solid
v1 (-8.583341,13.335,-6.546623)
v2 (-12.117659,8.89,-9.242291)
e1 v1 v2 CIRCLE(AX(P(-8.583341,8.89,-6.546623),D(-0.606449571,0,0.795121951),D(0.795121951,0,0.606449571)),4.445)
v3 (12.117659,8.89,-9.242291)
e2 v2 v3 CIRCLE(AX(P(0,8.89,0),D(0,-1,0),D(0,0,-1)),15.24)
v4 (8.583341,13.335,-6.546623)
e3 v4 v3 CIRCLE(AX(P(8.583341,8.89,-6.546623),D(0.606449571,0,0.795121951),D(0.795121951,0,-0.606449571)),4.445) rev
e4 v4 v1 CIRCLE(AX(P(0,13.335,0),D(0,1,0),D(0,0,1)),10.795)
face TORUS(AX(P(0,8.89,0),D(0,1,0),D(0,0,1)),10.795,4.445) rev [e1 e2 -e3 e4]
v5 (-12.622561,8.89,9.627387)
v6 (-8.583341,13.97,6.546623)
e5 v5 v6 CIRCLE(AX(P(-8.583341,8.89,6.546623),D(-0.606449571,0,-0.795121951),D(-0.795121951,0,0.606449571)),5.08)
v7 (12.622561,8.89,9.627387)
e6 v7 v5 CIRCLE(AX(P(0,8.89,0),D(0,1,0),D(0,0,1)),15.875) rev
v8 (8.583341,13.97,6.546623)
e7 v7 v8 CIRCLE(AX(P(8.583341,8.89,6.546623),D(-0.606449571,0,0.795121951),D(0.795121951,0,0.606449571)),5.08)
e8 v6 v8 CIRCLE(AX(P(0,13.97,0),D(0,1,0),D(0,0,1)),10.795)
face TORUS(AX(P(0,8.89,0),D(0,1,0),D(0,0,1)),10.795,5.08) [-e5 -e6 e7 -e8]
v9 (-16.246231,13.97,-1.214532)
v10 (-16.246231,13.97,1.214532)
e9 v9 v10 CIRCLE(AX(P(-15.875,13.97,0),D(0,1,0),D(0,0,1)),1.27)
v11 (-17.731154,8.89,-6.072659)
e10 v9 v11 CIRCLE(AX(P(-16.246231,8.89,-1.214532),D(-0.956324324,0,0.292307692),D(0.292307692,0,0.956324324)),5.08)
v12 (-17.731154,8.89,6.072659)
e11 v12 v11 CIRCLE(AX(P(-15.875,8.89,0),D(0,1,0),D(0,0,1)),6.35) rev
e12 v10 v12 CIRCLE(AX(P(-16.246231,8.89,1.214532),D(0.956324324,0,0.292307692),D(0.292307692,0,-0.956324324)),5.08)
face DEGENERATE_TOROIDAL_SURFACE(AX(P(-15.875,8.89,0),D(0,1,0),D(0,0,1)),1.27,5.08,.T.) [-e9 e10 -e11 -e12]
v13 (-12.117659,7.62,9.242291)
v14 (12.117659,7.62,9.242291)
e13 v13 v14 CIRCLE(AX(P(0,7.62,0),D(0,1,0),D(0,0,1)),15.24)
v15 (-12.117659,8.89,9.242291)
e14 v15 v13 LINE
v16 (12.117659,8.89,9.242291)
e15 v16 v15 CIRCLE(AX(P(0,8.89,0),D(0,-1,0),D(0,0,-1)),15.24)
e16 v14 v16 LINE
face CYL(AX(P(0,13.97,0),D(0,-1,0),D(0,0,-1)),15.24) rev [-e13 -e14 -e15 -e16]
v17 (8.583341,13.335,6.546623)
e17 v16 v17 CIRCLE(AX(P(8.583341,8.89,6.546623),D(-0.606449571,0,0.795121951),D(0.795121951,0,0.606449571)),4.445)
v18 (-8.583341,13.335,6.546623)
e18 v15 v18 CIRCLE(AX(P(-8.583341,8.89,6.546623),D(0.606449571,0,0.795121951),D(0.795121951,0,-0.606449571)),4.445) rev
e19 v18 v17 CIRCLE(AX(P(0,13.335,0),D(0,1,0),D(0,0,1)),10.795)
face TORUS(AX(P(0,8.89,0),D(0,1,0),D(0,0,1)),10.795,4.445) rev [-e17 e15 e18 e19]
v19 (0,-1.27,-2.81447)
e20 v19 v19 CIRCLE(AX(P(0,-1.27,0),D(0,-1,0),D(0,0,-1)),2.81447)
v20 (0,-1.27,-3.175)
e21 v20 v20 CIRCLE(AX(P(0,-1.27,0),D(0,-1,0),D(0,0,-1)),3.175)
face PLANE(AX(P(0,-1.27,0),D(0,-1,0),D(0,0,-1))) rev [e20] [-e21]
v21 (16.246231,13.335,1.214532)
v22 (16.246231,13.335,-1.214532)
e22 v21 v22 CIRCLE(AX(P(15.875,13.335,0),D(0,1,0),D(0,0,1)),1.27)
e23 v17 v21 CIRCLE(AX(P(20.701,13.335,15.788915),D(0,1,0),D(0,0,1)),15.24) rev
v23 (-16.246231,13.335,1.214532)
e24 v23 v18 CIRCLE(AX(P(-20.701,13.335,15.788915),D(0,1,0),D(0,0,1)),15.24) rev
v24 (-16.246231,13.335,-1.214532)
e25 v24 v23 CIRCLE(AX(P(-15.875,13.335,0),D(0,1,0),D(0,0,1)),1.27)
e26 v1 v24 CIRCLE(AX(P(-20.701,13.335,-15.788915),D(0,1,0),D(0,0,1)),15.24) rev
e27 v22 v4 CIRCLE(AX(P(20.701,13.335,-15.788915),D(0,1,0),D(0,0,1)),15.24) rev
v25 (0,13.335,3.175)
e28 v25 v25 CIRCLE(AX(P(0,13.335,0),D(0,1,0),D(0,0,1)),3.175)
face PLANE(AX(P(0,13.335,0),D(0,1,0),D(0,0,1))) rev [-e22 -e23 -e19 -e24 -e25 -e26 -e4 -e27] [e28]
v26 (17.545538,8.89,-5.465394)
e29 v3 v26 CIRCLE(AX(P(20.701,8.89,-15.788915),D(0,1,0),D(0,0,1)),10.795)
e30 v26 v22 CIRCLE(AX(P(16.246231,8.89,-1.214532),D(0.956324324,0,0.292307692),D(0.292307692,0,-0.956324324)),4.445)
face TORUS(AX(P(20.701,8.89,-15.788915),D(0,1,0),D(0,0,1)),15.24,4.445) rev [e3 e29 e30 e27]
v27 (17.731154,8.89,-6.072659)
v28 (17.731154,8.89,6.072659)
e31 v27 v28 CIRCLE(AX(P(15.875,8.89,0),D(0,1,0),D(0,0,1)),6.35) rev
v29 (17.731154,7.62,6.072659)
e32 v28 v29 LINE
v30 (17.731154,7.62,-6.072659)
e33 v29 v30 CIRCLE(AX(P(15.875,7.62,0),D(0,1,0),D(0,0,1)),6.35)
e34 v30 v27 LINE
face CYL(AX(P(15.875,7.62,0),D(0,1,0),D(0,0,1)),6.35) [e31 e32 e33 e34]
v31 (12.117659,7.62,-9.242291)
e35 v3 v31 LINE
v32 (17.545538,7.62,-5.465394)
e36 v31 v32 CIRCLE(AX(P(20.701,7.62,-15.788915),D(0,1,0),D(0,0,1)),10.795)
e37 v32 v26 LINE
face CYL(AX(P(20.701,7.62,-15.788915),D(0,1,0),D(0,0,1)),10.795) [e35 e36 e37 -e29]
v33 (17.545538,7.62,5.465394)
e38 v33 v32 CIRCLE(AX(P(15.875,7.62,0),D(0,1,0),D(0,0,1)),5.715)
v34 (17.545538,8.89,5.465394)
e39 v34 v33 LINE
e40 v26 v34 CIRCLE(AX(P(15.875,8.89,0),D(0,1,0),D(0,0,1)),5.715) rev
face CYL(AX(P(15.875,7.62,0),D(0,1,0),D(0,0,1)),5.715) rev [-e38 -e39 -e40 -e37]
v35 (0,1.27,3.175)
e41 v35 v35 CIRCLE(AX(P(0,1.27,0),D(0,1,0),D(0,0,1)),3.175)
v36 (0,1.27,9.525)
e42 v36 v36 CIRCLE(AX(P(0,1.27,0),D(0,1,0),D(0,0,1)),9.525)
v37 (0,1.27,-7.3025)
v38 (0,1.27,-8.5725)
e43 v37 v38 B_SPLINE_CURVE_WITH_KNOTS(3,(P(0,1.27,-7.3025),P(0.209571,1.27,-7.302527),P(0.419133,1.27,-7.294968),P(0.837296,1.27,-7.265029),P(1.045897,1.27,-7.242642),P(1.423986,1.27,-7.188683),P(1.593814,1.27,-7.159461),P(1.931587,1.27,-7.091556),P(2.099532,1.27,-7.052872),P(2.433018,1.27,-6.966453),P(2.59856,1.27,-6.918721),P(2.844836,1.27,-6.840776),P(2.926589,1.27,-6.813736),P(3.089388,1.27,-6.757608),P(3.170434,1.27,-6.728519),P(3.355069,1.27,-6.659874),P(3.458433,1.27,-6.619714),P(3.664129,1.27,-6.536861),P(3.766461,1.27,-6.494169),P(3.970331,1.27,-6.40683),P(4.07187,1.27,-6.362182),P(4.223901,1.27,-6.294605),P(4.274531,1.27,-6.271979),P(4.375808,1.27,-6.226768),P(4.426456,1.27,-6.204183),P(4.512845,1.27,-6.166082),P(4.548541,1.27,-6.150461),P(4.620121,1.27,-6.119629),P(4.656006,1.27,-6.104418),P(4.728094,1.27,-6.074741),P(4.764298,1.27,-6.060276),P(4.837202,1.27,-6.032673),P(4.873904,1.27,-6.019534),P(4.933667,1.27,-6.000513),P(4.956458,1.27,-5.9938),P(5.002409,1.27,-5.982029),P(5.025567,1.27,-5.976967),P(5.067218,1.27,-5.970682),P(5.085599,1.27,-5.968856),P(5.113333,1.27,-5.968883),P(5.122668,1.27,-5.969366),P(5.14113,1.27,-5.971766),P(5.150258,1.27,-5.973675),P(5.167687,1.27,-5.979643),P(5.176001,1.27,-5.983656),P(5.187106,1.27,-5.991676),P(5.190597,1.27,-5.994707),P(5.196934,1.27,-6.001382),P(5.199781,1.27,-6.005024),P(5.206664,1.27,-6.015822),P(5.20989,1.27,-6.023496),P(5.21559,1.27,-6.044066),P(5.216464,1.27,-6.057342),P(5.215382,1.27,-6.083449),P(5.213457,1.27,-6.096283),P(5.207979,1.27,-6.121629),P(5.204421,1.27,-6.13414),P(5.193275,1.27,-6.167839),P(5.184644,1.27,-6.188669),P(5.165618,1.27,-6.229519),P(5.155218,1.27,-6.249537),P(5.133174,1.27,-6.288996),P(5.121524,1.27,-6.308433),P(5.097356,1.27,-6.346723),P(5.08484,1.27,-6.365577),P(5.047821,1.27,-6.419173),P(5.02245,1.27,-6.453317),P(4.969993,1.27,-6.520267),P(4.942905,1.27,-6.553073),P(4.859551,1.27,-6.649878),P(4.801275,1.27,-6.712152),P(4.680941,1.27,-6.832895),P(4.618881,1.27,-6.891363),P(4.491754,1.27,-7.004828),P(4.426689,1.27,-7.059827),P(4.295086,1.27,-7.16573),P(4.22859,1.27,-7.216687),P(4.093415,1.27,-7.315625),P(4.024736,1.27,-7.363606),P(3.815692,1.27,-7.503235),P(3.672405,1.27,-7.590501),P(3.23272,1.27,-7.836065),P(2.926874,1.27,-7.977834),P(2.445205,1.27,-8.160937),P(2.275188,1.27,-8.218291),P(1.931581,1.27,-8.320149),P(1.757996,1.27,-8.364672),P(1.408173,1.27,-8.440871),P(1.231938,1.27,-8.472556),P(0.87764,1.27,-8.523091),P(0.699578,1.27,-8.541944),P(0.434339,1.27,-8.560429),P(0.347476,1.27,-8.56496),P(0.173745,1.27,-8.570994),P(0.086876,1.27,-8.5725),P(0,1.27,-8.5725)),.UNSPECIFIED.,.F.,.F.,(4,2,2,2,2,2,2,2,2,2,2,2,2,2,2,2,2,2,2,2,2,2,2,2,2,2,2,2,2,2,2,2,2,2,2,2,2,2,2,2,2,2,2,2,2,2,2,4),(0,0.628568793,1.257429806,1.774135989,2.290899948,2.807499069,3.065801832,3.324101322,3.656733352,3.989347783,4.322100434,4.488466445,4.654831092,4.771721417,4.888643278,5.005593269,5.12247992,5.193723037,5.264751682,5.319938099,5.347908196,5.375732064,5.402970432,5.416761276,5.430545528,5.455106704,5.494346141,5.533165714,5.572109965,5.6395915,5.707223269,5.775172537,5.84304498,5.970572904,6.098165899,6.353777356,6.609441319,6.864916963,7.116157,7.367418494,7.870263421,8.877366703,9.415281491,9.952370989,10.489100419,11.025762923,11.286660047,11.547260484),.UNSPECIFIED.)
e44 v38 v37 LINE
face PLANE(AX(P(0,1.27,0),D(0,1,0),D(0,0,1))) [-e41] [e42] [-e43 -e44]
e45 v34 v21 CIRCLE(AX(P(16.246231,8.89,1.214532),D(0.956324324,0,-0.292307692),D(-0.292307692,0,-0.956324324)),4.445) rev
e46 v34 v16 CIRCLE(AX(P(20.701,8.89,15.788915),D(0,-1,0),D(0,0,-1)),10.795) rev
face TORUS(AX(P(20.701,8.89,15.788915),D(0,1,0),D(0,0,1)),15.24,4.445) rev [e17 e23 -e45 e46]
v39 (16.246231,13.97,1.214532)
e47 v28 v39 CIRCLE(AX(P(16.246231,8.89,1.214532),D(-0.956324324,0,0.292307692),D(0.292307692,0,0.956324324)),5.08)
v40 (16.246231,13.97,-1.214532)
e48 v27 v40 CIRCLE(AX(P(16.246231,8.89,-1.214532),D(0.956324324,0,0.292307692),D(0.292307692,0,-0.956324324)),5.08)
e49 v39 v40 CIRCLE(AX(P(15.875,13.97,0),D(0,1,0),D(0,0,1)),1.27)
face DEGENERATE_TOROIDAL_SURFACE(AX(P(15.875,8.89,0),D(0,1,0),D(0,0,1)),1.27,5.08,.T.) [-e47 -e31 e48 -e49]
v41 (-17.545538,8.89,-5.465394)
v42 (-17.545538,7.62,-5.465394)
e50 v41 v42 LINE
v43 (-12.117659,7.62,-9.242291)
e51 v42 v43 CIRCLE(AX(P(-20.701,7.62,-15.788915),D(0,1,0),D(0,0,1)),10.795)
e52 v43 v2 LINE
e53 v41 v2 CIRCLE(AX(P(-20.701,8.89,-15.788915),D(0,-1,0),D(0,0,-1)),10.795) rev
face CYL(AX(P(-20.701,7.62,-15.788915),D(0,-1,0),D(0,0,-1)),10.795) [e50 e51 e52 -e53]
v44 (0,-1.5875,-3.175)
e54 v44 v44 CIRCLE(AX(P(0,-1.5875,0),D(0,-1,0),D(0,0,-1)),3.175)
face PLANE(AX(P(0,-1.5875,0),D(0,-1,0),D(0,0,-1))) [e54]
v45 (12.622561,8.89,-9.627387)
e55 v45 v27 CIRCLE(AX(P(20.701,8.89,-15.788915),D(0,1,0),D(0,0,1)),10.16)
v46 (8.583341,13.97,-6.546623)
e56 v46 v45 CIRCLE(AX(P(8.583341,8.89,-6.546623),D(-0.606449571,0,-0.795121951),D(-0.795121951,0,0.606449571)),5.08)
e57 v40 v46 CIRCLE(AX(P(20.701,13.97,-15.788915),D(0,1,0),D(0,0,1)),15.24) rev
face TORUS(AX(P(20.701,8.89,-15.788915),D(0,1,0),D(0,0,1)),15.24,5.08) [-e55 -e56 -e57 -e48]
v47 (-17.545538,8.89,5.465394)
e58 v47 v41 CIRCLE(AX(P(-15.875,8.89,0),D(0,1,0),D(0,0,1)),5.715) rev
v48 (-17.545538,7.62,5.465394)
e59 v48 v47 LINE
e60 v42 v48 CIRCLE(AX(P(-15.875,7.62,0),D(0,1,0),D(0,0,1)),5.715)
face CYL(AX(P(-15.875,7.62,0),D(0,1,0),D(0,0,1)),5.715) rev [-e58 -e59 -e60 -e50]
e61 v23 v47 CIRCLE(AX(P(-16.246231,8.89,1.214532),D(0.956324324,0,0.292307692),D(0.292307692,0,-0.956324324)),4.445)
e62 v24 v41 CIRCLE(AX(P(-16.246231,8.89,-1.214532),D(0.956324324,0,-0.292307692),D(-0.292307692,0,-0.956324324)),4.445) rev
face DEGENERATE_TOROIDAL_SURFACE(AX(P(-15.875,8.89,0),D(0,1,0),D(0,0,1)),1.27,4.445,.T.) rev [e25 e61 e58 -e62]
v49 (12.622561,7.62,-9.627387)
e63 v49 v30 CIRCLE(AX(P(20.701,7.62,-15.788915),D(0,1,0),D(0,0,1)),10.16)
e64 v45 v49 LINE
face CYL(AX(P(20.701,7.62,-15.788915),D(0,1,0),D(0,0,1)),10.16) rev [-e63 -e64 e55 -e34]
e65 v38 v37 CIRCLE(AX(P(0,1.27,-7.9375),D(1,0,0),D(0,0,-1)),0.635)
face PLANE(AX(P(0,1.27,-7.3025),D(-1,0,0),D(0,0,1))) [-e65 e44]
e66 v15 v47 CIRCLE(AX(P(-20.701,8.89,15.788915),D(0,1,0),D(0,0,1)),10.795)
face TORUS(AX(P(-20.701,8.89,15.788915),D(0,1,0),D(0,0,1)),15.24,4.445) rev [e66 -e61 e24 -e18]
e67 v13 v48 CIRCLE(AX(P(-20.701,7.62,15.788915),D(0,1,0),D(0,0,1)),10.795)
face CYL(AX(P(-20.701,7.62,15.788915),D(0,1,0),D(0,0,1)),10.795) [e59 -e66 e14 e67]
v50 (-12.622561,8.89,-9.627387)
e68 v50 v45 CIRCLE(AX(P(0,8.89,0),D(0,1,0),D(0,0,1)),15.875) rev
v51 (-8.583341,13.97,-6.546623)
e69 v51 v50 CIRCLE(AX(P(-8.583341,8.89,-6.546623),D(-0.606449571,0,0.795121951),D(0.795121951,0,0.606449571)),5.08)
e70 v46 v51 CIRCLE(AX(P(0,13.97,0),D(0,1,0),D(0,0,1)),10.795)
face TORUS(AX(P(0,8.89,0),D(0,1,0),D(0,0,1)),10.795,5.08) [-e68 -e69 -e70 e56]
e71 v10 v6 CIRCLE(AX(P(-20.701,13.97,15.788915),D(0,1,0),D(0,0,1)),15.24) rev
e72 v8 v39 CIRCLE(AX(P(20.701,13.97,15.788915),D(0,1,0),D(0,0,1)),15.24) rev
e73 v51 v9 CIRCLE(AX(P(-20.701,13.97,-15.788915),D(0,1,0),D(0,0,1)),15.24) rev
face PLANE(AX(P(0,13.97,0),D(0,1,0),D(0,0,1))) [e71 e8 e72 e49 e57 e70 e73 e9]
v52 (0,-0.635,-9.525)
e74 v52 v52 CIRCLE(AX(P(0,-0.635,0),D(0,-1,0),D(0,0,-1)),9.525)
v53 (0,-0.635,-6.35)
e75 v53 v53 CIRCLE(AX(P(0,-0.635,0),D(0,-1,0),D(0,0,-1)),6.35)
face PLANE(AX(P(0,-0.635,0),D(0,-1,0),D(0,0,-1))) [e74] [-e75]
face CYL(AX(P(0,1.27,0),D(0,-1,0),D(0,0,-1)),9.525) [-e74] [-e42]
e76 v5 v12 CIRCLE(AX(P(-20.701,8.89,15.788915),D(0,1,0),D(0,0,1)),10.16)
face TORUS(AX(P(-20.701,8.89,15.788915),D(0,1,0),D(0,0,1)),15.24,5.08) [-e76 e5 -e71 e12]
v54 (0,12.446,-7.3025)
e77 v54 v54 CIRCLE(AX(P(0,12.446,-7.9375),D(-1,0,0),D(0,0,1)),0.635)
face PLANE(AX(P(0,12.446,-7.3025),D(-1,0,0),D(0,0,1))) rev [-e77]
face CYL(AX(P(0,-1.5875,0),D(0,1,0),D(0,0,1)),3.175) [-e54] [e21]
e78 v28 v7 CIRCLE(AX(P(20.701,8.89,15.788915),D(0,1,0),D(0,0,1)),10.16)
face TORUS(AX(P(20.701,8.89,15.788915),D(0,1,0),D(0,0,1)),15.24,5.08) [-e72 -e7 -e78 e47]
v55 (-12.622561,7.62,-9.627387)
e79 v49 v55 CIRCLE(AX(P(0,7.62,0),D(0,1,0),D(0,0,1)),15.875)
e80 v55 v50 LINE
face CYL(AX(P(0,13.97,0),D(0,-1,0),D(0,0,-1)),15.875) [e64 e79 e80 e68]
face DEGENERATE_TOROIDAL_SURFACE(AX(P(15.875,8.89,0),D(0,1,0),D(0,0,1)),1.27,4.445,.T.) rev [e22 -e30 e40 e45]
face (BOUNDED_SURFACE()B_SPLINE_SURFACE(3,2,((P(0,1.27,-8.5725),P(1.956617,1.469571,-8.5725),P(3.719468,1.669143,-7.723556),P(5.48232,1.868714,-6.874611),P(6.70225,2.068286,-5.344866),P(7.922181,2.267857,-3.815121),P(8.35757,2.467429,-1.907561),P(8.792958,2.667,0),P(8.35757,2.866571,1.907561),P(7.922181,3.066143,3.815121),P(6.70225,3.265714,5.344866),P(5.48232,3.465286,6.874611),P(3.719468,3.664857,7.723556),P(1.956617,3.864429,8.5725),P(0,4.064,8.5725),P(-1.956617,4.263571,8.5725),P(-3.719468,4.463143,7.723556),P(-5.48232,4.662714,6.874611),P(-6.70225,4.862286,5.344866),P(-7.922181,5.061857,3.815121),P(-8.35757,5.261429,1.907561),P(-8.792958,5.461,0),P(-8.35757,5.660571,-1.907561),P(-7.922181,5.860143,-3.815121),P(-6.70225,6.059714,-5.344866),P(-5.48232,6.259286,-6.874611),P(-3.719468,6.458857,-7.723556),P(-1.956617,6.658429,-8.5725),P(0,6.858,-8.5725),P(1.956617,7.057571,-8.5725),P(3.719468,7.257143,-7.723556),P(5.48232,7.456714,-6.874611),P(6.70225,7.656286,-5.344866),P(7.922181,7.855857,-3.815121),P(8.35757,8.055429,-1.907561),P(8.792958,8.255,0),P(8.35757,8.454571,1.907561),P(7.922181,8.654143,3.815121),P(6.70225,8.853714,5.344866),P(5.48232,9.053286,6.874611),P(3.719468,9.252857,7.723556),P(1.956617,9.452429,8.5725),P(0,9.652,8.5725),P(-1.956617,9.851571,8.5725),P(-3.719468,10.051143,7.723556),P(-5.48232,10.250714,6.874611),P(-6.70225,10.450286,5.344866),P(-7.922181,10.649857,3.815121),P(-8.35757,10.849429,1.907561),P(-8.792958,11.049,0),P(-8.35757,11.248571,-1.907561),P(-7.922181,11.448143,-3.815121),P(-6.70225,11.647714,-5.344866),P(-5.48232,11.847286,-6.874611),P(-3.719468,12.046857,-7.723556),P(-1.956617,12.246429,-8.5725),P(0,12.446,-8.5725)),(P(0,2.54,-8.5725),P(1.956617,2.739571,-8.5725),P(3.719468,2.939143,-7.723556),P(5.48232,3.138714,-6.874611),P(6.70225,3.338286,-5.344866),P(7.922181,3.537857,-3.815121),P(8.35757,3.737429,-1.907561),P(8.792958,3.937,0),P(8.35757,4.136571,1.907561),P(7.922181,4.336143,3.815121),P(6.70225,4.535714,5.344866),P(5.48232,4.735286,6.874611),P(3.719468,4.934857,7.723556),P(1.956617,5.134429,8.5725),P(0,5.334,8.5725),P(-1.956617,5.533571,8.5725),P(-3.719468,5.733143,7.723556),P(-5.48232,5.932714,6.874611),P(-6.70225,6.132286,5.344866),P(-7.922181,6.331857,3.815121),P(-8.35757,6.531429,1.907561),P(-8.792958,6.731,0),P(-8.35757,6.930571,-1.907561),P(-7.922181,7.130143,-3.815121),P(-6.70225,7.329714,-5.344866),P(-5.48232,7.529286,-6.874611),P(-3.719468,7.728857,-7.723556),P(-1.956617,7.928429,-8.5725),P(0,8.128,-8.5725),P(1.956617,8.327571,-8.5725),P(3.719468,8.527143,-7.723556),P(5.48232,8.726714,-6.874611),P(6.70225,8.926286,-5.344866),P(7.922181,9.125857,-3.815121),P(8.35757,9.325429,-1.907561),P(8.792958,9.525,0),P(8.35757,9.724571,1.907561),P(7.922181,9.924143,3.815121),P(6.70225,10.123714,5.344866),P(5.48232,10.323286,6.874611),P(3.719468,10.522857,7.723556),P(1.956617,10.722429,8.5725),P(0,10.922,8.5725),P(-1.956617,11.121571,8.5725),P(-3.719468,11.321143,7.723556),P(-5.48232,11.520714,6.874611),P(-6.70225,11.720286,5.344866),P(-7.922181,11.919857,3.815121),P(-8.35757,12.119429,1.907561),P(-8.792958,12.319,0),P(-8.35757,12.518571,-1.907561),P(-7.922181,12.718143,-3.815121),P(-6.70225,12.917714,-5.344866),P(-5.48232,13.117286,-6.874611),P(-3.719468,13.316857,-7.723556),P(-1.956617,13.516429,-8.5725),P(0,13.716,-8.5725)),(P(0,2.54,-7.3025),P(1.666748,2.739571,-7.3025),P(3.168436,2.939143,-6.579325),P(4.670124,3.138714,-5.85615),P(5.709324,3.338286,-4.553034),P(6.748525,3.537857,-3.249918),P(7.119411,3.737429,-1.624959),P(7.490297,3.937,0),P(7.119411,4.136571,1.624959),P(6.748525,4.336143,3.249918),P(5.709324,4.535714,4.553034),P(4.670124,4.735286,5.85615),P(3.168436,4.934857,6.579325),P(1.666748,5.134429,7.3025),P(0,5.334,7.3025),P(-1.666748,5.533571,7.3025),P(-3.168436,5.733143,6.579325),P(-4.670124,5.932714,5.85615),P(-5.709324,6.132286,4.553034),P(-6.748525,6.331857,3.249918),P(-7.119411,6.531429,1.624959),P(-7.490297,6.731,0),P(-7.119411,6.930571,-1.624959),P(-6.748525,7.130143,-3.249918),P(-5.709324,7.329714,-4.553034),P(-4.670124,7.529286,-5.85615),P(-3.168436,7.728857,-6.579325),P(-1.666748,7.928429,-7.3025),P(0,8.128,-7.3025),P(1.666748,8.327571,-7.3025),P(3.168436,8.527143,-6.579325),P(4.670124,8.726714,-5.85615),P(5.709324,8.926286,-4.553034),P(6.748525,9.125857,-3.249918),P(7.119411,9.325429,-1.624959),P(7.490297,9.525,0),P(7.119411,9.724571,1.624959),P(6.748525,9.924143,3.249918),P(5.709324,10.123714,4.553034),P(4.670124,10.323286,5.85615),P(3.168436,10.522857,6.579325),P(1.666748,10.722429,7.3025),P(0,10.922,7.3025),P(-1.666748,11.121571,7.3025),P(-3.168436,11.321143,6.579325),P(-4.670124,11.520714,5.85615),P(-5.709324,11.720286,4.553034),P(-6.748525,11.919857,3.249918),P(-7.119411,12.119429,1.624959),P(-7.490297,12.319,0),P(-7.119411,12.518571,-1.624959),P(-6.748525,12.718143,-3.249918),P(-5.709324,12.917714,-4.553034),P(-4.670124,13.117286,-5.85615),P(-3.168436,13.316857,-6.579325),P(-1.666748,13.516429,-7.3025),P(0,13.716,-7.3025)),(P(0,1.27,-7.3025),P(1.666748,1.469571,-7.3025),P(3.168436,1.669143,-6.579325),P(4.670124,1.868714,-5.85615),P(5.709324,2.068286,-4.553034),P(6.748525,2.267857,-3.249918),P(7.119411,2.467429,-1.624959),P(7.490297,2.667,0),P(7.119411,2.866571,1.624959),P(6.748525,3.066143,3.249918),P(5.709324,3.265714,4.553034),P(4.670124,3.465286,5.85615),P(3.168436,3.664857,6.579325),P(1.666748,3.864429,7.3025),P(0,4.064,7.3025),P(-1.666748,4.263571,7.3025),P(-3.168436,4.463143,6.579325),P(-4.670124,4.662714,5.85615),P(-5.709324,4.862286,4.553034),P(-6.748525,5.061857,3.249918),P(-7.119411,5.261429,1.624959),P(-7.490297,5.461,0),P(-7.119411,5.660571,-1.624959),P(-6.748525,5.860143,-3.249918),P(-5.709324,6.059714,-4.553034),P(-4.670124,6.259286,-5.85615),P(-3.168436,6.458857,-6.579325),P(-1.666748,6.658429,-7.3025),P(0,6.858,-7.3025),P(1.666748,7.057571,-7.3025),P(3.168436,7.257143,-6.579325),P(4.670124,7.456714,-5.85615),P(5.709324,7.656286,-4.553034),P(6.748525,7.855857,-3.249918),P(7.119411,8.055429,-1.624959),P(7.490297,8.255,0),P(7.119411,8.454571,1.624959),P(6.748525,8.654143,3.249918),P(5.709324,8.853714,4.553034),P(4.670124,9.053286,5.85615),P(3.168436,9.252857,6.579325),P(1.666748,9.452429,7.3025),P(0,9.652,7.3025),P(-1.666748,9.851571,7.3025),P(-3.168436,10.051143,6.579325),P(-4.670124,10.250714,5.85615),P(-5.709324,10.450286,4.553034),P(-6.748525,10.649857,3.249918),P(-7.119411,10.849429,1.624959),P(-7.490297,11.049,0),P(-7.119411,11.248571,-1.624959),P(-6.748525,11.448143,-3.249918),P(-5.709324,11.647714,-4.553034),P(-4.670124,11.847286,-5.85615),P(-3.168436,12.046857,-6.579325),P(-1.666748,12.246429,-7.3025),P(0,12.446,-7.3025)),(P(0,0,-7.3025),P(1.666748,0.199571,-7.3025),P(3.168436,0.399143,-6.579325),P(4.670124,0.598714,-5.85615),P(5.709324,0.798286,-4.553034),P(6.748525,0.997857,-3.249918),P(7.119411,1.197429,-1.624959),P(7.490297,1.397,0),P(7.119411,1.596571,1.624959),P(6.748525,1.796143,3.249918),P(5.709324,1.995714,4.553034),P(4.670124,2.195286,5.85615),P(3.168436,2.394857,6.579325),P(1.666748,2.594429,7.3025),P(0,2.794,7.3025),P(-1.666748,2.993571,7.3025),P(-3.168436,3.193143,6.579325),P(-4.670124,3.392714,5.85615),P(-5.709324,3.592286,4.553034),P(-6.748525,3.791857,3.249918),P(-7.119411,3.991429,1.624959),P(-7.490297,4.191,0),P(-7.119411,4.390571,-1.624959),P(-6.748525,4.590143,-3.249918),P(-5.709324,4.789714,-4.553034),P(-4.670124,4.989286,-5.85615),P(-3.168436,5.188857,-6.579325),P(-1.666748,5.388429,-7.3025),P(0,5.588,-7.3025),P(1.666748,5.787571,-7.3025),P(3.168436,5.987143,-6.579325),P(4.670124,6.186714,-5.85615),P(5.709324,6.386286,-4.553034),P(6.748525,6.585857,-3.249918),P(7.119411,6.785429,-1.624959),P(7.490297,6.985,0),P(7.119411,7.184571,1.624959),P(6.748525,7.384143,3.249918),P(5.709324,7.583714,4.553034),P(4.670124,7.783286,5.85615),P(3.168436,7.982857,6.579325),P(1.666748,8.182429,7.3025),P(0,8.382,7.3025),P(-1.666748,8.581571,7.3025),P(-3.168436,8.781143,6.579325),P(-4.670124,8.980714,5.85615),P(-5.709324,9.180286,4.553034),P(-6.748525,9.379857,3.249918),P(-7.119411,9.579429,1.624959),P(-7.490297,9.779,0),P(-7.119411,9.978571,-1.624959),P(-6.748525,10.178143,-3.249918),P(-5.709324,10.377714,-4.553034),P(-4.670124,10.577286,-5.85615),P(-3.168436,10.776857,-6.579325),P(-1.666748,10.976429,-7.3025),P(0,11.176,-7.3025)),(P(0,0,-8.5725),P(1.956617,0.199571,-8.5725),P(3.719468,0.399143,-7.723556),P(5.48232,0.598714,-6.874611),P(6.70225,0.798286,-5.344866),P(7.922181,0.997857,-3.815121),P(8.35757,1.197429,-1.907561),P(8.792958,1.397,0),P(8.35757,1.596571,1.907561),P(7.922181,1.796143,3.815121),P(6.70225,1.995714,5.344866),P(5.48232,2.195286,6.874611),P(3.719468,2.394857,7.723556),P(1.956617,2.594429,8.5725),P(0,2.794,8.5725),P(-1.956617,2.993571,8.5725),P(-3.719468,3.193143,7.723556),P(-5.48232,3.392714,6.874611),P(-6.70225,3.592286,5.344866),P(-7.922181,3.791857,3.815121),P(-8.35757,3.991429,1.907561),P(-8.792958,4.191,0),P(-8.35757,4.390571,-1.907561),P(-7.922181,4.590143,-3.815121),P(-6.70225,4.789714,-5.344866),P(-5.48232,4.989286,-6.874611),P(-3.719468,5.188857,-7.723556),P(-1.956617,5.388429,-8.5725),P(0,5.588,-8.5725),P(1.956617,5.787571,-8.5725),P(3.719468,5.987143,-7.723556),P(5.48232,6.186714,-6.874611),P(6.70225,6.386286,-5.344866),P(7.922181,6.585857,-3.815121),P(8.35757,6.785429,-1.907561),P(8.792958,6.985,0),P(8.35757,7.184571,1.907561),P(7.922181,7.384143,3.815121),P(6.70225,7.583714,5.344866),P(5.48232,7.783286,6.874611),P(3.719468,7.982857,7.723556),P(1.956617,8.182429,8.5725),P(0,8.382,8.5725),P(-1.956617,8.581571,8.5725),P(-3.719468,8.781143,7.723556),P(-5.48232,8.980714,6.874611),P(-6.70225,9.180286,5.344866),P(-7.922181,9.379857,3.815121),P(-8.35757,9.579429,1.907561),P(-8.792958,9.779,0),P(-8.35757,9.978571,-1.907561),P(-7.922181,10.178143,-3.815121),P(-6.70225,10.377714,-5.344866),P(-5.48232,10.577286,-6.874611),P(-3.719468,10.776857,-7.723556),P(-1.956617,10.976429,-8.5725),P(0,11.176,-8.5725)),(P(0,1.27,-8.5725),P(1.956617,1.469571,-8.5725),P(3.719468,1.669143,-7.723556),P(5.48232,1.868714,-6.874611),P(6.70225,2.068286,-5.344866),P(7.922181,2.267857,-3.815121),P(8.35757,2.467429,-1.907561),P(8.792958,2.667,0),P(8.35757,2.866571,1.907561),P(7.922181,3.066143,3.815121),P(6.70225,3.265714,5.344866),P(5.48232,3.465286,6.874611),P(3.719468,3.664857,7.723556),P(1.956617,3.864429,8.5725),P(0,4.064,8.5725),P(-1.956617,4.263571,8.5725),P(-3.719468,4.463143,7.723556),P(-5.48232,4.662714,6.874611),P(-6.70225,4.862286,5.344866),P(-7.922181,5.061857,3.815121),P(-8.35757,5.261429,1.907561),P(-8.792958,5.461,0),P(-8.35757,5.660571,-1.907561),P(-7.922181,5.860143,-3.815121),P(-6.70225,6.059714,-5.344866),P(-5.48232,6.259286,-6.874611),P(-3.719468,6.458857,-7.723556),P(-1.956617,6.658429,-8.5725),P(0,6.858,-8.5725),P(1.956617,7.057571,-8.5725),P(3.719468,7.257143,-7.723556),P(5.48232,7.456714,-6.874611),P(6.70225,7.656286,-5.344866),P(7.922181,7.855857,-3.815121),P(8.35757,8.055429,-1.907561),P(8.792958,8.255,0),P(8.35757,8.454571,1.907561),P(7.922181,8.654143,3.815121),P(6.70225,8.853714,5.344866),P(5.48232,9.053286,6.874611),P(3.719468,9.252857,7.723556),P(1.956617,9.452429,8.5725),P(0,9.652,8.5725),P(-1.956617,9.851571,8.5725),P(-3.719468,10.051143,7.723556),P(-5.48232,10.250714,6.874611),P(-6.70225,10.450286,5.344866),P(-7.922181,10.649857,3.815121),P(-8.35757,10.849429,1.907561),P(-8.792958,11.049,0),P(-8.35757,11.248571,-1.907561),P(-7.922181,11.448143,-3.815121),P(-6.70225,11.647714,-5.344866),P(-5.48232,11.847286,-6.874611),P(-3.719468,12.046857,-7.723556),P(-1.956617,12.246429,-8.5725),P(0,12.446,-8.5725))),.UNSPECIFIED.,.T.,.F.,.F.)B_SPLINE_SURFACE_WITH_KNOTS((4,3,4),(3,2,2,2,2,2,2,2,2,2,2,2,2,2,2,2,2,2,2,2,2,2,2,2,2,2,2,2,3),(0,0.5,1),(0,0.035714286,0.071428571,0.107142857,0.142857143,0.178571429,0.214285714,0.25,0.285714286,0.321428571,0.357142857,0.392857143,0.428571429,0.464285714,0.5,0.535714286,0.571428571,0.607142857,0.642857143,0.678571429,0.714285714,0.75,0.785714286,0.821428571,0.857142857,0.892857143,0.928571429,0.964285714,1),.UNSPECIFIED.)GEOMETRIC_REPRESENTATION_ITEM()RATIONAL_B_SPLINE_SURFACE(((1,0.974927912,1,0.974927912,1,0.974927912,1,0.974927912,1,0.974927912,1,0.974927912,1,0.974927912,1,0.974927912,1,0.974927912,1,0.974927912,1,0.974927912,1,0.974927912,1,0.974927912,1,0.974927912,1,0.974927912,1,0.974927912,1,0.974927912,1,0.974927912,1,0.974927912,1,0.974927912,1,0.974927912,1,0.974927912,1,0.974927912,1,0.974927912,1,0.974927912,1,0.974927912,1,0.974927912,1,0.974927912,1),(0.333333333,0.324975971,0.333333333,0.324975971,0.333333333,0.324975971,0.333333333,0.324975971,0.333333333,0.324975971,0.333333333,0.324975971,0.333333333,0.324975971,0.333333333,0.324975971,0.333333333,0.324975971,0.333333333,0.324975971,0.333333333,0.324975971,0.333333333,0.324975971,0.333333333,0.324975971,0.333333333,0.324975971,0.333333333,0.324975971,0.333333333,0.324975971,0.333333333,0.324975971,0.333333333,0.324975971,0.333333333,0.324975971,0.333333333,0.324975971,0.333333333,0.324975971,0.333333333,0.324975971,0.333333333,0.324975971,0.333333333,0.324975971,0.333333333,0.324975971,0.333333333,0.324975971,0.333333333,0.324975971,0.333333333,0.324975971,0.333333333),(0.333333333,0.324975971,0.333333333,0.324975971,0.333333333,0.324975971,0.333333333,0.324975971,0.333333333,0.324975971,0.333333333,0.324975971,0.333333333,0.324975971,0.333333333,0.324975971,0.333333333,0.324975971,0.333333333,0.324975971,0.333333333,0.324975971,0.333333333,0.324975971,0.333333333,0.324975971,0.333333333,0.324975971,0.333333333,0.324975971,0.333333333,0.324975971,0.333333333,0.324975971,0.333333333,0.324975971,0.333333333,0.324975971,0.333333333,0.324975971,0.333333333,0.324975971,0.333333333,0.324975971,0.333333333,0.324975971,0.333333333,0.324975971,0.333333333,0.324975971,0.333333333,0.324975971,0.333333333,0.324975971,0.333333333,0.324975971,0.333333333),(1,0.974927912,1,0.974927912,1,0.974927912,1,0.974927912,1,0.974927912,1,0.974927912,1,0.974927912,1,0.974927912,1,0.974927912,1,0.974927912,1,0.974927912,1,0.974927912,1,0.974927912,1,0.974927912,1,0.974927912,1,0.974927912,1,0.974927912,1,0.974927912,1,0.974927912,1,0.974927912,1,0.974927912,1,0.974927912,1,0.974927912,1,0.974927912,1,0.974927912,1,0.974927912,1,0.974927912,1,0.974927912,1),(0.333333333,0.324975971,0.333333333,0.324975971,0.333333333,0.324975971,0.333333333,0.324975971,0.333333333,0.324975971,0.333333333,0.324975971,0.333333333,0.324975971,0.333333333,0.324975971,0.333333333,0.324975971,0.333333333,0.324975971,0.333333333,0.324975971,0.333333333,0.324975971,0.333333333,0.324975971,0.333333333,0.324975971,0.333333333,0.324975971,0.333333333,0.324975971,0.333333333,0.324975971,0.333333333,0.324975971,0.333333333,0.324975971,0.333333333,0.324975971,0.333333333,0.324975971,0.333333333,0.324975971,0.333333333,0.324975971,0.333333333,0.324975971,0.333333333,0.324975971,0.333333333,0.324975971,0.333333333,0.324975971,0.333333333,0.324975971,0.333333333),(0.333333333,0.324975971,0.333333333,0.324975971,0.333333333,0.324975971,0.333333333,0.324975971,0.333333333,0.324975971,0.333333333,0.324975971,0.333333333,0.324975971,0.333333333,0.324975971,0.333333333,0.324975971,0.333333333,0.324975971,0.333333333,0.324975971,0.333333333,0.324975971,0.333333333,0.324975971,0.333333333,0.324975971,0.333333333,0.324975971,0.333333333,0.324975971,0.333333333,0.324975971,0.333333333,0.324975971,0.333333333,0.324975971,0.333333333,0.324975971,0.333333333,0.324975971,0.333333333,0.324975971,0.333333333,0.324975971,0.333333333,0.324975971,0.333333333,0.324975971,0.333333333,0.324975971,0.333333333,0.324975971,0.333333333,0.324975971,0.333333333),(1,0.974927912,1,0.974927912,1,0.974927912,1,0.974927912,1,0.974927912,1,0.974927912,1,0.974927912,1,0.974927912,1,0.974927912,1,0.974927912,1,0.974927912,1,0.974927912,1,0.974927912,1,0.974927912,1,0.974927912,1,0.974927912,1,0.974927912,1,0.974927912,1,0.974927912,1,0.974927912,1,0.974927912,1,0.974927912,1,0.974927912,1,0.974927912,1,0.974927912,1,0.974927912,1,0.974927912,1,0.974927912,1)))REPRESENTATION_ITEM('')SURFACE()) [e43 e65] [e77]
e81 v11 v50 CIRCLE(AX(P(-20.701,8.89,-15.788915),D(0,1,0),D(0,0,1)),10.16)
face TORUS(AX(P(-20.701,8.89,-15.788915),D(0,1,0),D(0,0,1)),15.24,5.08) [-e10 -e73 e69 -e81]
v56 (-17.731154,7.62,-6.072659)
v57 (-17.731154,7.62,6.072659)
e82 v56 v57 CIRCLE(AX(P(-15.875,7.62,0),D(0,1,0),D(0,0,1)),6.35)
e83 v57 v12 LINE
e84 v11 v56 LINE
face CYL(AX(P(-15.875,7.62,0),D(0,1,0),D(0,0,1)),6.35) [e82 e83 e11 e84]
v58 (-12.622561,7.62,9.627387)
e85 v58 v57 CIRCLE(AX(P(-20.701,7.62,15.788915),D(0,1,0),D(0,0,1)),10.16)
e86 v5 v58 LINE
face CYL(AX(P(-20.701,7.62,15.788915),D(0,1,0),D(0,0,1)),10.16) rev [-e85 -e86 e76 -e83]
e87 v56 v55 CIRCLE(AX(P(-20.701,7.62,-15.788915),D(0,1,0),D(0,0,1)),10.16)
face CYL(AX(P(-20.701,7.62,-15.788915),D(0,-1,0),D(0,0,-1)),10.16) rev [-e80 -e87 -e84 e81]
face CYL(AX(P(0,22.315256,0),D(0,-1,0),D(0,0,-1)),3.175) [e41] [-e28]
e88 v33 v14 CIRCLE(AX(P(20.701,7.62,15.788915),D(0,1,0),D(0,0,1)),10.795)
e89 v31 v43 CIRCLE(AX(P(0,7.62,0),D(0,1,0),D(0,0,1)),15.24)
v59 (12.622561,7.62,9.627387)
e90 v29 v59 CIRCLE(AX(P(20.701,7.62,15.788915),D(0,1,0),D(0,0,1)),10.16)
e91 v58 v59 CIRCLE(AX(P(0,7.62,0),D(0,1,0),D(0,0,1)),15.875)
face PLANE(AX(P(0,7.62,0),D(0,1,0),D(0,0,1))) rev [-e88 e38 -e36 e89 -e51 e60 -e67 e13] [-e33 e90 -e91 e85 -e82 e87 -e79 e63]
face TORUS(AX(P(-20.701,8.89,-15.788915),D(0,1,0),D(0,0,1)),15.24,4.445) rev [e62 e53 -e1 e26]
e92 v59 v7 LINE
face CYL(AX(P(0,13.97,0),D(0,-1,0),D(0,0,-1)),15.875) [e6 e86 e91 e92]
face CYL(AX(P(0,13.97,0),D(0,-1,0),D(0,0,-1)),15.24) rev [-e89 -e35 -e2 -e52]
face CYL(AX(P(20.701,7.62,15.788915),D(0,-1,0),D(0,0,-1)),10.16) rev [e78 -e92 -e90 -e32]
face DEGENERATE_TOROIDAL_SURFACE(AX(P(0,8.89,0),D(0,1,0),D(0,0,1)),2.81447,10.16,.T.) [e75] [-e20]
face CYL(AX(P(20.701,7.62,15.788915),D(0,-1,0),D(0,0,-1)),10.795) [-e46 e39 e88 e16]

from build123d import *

# Parameters (mm, degrees)
SKETCH1_R           = 9.525
BOSS_EXTRUDE1_DEPTH = 1.27
BOSS_EXTRUDE3_START = 0.635
SKETCH2_R           = 9.525
BOSS_EXTRUDE3_DEPTH = 0.635
SKETCH3_R           = 6.35
BOSS_EXTRUDE4_DEPTH = 0.635
FILLET1_R           = 10.16
SKETCH4_R           = 3.175
BOSS_EXTRUDE5_DEPTH = 0.3175
SKETCH6_R           = 15.875
BOSS_EXTRUDE7_DEPTH = 6.35
SKETCH7_R           = 6.35
BOSS_EXTRUDE8_DEPTH = 6.35
FILLET2_R           = 10.16
FILLET3_R           = 5.08
SHELL1_T            = -0.635
BOSS_EXTRUDE9_REACH = 32.121
SKETCH5_R           = 3.175
SWEEP1_PITCH        = 5.588
SWEEP1_HEIGHT       = 11.176
SWEEP1_RADIUS       = 7.9375
SWEEP1_START_ANGLE  = -180
SKETCH10_R          = 0.635


with BuildPart() as part:
    # Sketch1 → Boss-Extrude1 (new body)
    with BuildSketch(Plane(origin=(0, 0, 0), x_dir=(1, 0, 0), z_dir=(0, 1, 0))):
        with Locations(Location((0, 0, 0), (0, 0, 270))):
            Circle(SKETCH1_R)
    extrude(amount=BOSS_EXTRUDE1_DEPTH)

    # Sketch2 → Boss-Extrude3 (add)
    with BuildSketch(Plane.XZ.offset(BOSS_EXTRUDE3_START)):
        with Locations(Location((0, 0, 0), (0, 0, 270))):
            Circle(SKETCH2_R)
    extrude(amount=-BOSS_EXTRUDE3_DEPTH)

    # Sketch3 → Boss-Extrude4 (add)
    with BuildSketch(Plane.XZ.offset(0.635)):
        with Locations(Location((0, 0, 0), (0, 0, 270))):
            Circle(SKETCH3_R)
    extrude(amount=BOSS_EXTRUDE4_DEPTH)

    # Fillet1
    # the kernel refuses this fillet: 10.16 mm, written as the material it takes off along each edge
    with BuildSketch(Plane(origin=(0, -1.27, 0), x_dir=(0, 0, -1), z_dir=(-1, 0, 0))) as fillet1_piece_1:
        with BuildLine():
            CenterArc((2.81446963, -10.16), FILLET1_R, 69.635865194, 20.364134806)
            Line((2.81446963, 0), (2.81446963, 0.2032))
            Line((2.81446963, 0.2032), (6.35, 0.2032))
            Line((6.35, 0.2032), (6.5532, 0))
            ThreePointArc((6.5532, 0), (6.5532, -0.3175), (6.420710607, -0.4445))
            Line((6.420710607, -0.4445), (6.35, -0.635))
        make_face()
    revolve(axis=Axis((0, -1.27, 0), (0, -1, 0)), mode=Mode.SUBTRACT)

    # Sketch4 → Boss-Extrude5 (add)
    with BuildSketch(Plane.XZ.offset(1.27)):
        with Locations(Location((0, 0, 0), (0, 0, 270))):
            Circle(SKETCH4_R)
    extrude(amount=BOSS_EXTRUDE5_DEPTH)


with BuildPart() as body_2:
    # Sketch6 → Boss-Extrude7 (new body)
    with BuildSketch(Plane(origin=(0, 7.62, 0), x_dir=(-1, 0, 0), z_dir=(0, 1, 0))):
        with Locations(Location((0, 0, 0), (0, 0, 90))):
            Circle(SKETCH6_R)
    extrude(amount=BOSS_EXTRUDE7_DEPTH)

    # Sketch7 → Boss-Extrude8 (add)
    with BuildSketch(Plane(origin=(0, 13.97, 0), x_dir=(1, 0, 0), z_dir=(0, 1, 0))):
        with Locations((-15.875, 0)):
            Circle(SKETCH7_R)
        with Locations((15.875, 0)):
            Circle(SKETCH7_R)
    extrude(amount=-BOSS_EXTRUDE8_DEPTH)

    # Fillet2
    fillet2_edges = [body_2.edges().sort_by_distance(p)[0] for p in [
        (14.605, 10.795, 6.221703947),
        (14.605, 10.795, -6.221703947),
        (-14.605, 10.795, -6.221703947),
        (-14.605, 10.795, 6.221703947),
    ]]
    fillet(fillet2_edges, radius=FILLET2_R)

    # Fillet3
    fillet3_edges = [body_2.edges().sort_by_distance(p)[0] for p in [
        (0, 13.97, -15.875),
        (22.225, 13.97, 0),
        (0, 13.97, 15.875),
        (-22.225, 13.97, 0),
        (14.897968618, 13.97, -7.449224743),
        (14.897968618, 13.97, 7.449224743),
        (-14.897968618, 13.97, -7.449224743),
        (-14.897968618, 13.97, 7.449224743),
    ]]
    fillet(fillet3_edges, radius=FILLET3_R)

    # Shell1
    shell1_openings = [body_2.faces().sort_by_distance(p)[0] for p in [
        (0, 7.62, 0),
    ]]
    offset(amount=SHELL1_T, openings=shell1_openings)

    # Sketch5 → Boss-Extrude9 (add, up to next)
    with BuildSketch(Plane(origin=(0, 1.27, 0), x_dir=(1, 0, 0), z_dir=(0, 1, 0)), mode=Mode.PRIVATE) as boss_extrude9_sk1:
        with Locations(Location((0, 0, 0), (0, 0, 90))):
            Circle(SKETCH5_R)
    boss_extrude9_tool1 = extrude(boss_extrude9_sk1.sketch, amount=BOSS_EXTRUDE9_REACH, mode=Mode.PRIVATE) - body_2.part

    add(part.part)  # Boss-Extrude9 merges part
    add(boss_extrude9_tool1.solids().sort_by_distance((0, 1.27, 0))[0])

    # Sweep1: sweep along a helix
    with BuildLine() as sweep1_path:
        add(Helix(SWEEP1_PITCH, SWEEP1_HEIGHT, SWEEP1_RADIUS, center=(0, 1.27, 0), direction=(0, 1, 0), lefthand=True, mode=Mode.PRIVATE).rotate(Axis((0, 1.27, 0), (0, 1, 0)), SWEEP1_START_ANGLE))
    # Sketch10 → Sweep1 (sweep)
    with BuildSketch(Plane(origin=(0, 0, 0), x_dir=(0, 0, -1), z_dir=(1, 0, 0))):
        with Locations((7.9375, 1.27)):
            Circle(SKETCH10_R)
    sweep(path=sweep1_path.line, is_frenet=True)


solid = body_2.part
